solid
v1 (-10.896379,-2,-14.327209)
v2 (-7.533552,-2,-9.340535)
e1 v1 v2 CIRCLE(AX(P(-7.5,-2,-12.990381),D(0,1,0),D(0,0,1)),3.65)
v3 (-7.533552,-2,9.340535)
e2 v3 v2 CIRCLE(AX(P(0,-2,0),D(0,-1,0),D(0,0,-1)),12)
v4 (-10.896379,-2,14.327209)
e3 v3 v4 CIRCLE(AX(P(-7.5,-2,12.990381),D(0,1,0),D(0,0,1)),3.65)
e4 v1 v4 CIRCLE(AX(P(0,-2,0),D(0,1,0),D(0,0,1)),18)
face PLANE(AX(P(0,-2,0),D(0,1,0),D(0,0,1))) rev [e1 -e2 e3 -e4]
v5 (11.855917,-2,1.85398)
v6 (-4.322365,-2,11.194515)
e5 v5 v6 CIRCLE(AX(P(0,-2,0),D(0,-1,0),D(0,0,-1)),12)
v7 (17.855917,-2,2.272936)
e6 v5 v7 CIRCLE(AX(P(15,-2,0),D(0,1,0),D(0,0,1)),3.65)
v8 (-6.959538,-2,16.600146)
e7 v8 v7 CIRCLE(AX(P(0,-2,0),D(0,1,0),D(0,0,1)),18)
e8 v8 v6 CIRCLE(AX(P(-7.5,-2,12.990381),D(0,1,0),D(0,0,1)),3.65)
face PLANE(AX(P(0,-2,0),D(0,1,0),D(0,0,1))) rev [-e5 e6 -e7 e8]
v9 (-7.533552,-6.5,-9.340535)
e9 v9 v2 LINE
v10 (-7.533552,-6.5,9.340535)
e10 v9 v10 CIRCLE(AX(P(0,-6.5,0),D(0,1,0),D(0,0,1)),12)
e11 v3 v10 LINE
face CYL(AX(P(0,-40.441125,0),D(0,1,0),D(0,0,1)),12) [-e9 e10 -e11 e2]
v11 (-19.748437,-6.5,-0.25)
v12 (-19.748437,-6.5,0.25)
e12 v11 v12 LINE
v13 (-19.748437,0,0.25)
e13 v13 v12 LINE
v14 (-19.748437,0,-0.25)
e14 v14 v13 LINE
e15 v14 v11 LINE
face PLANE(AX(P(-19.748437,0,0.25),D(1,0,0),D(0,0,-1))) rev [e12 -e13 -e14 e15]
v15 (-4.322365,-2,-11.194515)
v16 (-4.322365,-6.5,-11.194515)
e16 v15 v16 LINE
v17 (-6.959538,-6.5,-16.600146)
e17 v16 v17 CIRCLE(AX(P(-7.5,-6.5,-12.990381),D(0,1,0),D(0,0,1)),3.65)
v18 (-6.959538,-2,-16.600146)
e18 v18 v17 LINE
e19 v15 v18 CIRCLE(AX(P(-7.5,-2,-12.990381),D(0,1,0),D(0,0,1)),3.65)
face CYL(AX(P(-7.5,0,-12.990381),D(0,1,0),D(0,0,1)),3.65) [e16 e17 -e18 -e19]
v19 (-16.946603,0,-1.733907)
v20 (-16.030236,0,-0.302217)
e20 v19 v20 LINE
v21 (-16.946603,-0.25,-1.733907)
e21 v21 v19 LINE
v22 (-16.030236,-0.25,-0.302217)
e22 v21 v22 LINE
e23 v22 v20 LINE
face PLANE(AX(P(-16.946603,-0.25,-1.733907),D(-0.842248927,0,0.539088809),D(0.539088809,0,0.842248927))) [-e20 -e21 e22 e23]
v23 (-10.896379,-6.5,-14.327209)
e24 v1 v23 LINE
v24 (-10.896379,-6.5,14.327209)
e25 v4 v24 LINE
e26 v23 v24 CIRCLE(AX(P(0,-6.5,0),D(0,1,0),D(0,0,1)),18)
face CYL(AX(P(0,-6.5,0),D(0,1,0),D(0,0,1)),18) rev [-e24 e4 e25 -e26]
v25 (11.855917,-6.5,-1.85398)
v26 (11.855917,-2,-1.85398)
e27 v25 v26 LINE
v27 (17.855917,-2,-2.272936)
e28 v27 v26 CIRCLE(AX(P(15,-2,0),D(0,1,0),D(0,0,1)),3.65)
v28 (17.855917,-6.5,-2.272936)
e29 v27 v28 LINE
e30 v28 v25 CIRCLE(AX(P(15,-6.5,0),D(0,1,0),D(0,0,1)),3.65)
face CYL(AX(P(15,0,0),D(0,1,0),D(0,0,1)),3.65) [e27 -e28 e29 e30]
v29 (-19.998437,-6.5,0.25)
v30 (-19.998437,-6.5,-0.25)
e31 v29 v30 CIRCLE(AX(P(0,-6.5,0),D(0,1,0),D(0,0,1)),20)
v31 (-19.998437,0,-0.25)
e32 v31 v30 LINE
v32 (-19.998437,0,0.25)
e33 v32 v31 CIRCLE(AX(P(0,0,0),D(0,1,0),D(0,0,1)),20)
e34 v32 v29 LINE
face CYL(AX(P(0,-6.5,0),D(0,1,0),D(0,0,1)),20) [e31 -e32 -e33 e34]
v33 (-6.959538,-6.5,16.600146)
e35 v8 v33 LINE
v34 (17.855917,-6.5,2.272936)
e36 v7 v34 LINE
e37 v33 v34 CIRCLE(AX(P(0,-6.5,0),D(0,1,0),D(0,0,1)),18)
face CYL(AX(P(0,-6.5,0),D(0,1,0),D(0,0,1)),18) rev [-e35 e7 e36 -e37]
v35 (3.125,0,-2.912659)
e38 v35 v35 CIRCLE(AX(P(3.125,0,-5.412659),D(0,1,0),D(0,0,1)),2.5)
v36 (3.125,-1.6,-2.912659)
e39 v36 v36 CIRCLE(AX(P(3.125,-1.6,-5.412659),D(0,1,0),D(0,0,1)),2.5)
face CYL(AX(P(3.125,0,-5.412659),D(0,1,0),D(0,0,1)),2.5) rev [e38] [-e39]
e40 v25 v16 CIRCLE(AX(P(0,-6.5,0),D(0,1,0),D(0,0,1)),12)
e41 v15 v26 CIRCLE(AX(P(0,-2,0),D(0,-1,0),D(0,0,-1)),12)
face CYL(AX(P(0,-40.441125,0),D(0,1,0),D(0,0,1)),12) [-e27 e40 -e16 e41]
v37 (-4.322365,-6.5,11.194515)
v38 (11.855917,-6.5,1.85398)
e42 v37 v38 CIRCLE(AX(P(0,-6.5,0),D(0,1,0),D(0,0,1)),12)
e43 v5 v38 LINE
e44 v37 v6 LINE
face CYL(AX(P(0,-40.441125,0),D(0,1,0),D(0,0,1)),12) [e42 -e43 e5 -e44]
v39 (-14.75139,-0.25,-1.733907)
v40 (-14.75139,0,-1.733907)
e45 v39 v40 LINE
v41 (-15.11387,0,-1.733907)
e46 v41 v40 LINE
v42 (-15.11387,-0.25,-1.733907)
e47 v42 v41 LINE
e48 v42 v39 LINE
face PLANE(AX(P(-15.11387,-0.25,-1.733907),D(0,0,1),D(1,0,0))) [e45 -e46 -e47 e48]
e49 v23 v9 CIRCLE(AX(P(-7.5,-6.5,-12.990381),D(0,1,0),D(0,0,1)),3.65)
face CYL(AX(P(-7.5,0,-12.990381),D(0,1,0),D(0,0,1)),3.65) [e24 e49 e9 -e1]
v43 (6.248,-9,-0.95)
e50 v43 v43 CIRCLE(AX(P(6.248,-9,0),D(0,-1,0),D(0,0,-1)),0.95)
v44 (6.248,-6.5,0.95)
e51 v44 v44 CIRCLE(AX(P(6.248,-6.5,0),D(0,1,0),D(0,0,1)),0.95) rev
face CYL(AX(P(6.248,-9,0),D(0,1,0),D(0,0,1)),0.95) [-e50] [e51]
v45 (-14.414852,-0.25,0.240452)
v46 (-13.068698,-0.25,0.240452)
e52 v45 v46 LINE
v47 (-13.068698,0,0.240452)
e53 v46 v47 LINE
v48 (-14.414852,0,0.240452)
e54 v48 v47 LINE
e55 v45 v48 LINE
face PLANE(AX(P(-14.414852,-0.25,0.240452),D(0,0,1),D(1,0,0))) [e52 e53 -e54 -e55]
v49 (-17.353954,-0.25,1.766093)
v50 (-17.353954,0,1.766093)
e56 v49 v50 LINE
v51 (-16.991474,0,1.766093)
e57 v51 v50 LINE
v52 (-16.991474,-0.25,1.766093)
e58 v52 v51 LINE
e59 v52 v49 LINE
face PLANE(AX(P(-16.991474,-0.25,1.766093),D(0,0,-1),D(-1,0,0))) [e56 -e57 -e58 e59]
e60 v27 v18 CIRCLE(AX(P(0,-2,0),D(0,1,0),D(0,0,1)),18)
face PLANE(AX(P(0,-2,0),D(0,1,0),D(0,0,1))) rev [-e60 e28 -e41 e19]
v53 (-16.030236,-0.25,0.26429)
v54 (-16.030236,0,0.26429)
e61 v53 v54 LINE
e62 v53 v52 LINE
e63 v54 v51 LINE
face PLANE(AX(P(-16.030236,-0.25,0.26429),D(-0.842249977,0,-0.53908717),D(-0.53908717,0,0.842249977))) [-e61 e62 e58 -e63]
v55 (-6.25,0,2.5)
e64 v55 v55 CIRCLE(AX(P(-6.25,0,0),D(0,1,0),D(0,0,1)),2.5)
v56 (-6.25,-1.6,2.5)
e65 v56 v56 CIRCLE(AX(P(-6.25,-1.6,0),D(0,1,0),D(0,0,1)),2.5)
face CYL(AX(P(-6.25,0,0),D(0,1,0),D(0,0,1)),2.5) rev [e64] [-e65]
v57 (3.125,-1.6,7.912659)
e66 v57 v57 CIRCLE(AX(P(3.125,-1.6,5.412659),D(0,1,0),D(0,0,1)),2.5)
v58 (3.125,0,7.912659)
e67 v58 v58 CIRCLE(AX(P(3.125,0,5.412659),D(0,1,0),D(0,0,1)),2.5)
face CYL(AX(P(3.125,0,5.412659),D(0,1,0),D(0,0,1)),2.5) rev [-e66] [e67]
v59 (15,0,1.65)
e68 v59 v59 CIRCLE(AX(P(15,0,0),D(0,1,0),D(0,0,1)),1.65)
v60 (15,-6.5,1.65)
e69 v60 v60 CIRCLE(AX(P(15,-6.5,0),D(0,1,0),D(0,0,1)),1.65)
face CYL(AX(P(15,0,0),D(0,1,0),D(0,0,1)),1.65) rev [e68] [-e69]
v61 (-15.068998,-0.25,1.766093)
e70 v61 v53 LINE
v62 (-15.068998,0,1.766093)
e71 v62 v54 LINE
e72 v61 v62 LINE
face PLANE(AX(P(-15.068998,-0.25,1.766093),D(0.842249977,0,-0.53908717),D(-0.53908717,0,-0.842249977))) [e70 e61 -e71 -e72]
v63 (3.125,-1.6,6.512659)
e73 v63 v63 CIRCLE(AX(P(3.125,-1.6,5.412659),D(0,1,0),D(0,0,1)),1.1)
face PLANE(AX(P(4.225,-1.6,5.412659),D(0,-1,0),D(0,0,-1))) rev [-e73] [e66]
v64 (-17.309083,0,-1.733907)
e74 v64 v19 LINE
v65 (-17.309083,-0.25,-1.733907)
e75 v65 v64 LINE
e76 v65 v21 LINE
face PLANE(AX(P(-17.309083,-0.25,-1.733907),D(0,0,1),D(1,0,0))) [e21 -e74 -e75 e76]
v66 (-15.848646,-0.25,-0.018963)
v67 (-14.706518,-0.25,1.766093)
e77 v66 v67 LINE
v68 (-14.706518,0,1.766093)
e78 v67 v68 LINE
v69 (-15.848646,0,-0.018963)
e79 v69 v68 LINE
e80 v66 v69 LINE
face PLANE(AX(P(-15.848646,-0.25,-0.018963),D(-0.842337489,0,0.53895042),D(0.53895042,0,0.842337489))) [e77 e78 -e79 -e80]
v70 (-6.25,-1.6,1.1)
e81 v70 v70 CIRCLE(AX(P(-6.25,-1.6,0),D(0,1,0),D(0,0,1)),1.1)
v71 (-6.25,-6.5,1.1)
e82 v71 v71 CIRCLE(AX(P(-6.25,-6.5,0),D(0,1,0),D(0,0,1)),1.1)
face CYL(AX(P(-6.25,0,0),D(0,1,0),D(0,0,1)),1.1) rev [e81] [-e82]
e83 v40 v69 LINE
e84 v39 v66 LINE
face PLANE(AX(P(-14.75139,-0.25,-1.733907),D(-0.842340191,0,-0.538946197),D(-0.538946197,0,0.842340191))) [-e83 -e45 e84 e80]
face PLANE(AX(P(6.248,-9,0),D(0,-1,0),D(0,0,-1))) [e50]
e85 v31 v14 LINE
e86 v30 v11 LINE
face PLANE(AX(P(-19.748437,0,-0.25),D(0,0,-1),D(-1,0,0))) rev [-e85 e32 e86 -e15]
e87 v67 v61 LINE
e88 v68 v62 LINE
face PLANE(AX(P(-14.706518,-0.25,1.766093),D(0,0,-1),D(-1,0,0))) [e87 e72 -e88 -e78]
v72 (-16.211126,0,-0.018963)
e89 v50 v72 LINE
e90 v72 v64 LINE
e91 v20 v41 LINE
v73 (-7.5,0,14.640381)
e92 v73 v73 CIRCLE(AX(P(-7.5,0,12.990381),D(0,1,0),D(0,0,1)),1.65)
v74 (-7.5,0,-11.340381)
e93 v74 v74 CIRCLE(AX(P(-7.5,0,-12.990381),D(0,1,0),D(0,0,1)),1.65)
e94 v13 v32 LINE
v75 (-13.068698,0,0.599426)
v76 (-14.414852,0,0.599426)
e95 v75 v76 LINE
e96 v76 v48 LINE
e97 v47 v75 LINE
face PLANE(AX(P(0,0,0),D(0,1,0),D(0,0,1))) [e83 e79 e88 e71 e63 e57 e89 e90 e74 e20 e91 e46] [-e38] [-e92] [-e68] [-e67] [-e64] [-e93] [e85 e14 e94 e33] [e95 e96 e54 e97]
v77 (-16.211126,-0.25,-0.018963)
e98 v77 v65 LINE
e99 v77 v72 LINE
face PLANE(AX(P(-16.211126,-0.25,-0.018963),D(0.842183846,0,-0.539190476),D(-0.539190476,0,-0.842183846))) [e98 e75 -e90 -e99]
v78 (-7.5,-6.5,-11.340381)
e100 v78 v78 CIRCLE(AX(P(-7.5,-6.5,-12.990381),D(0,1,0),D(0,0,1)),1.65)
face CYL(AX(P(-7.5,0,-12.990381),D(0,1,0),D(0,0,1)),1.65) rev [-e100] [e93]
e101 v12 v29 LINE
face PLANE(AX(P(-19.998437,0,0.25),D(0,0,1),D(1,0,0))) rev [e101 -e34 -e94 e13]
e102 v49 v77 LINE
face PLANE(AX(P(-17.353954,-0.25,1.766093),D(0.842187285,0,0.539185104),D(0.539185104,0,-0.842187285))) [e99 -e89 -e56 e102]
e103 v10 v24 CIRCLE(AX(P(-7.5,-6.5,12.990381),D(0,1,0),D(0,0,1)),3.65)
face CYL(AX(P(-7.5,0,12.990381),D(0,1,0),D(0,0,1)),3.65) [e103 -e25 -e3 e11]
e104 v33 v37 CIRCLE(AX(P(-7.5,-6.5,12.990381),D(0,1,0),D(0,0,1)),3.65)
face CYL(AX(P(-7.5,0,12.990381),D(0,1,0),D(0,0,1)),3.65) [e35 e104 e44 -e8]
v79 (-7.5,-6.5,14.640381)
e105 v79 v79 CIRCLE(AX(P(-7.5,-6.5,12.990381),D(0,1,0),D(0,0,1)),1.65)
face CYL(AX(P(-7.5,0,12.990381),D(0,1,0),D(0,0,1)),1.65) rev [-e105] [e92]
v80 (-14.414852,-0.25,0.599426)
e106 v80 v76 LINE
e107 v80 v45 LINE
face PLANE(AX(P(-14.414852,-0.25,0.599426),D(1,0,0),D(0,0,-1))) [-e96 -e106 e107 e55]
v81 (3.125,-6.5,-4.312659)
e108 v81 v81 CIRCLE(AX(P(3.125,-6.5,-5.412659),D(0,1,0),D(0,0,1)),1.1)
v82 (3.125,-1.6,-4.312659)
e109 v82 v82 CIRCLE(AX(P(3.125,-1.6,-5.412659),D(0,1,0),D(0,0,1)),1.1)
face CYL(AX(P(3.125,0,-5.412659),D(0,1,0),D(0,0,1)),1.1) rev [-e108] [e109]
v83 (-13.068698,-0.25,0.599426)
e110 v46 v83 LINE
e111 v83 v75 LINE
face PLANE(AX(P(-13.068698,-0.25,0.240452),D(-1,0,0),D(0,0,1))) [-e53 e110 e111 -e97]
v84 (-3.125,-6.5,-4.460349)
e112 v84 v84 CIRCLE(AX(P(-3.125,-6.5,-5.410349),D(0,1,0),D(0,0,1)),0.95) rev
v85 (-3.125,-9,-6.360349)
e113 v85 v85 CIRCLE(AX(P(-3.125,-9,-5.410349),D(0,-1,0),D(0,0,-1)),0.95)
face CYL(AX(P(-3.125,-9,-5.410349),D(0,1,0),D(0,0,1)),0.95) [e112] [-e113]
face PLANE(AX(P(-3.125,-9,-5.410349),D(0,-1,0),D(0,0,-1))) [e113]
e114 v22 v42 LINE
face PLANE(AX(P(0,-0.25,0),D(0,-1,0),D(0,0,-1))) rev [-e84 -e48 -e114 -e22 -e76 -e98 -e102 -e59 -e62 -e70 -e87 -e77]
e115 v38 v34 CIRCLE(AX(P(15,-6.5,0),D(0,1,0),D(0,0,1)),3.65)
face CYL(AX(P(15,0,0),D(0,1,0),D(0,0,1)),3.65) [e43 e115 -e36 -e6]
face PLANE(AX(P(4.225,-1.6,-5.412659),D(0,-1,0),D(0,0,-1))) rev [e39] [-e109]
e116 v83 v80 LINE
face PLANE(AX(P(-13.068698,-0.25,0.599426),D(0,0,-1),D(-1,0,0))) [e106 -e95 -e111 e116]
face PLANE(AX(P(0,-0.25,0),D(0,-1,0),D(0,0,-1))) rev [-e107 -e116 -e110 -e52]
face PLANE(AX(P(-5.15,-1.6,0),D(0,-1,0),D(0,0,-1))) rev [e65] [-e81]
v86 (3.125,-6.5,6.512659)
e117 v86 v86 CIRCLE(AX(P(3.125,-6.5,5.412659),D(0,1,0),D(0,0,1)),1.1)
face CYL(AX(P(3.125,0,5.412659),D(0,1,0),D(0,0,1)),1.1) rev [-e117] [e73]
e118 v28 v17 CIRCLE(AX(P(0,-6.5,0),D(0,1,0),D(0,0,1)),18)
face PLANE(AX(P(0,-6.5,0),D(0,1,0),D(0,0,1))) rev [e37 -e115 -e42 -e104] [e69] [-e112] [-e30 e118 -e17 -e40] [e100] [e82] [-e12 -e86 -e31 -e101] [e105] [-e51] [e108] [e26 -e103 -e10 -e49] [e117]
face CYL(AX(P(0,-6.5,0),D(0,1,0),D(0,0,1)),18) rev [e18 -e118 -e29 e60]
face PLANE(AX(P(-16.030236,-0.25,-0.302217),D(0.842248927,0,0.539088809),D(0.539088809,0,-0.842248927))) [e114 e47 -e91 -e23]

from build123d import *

# Parameters (mm, degrees)
SKETCH1_R                                        = 20
BOSS_EXTRUDE1_DEPTH                              = 6.5
CBORE_FOR_M2_PAN_HEAD_MACHINE_SCREW1_D           = 2.2
CBORE_FOR_M2_PAN_HEAD_MACHINE_SCREW1_CBORE_D     = 5
CBORE_FOR_M2_PAN_HEAD_MACHINE_SCREW1_CBORE_DEPTH = 1.6
TAP_DRILL_FOR_M4X0_7_TAP1_D                      = 3.3
SHELL1_START                                     = -6.5
SHELL1_OUTLINE_R                                 = 4.5
SHELL1_DEPTH                                     = 4.5
SHELL1_2_OUTLINE_R                               = 4.5
SHELL1_2_OUTLINE_R_2                             = 3.1
SHELL1_2_DEPTH                                   = 2.9
BOSS_EXTRUDE2_START                              = 4.5
SKETCH5_R                                        = 12
SKETCH5_R_2                                      = 1.1
BOSS_EXTRUDE2_DEPTH                              = 4.5
SKETCH6_W                                        = 1.346153846
SKETCH6_H                                        = 0.358974359
CUT_EXTRUDE1_DEPTH                               = 0.25
SKETCH7_R                                        = 0.95
BOSS_EXTRUDE3_DEPTH                              = 2.5
CUT_EXTRUDE2_DEPTH                               = 30.021543722


# Read off the part's stored shape, not the designer's step: Shell1
with BuildPart() as part:
    # Sketch1 → Boss-Extrude1 (new body)
    with BuildSketch(Plane(origin=(0, 0, 0), x_dir=(1, 0, 0), z_dir=(0, 1, 0))):
        with Locations(Location((0, 0, 0), (0, 0, 270))):
            Circle(SKETCH1_R)
    extrude(amount=-BOSS_EXTRUDE1_DEPTH)

    # CBORE for M2 Pan Head Machine Screw1 (through all)
    with Locations(Plane(origin=(3.125, 0, -5.412658774), x_dir=(0, 0, 1), z_dir=(0, 1, 0))):
        with Locations((0, 0), (5.412658774, -9.375), (10.825317548, 0)):
            CounterBoreHole(CBORE_FOR_M2_PAN_HEAD_MACHINE_SCREW1_D / 2, CBORE_FOR_M2_PAN_HEAD_MACHINE_SCREW1_CBORE_D / 2, CBORE_FOR_M2_PAN_HEAD_MACHINE_SCREW1_CBORE_DEPTH)

    # Tap Drill for M4x0.7 Tap1 (through all)
    with Locations(Plane(origin=(0, 0, 0), x_dir=(1, 0, 0), z_dir=(0, 1, 0))):
        with Locations((15, 0), (-7.5, 12.990381057), (-7.5, -12.990381057)):
            Hole(TAP_DRILL_FOR_M4X0_7_TAP1_D / 2)

    # Shell1 outline → Shell1 (cut)
    with BuildSketch(Plane(origin=(0, 0, 0), x_dir=(1, 0, 0), z_dir=(0, 1, 0)).offset(SHELL1_START)):
        with BuildLine():
            ThreePointArc((17.855916667, -2.272936425), (11.35, 0), (17.855916667, 2.272936425))
            ThreePointArc((17.855916667, 2.272936425), (9, 15.588457268), (-6.959537648, 16.600145654))
            ThreePointArc((-6.959537648, 16.600145654), (-5.675, 9.829388333), (-10.896379019, 14.327209229))
            ThreePointArc((-10.896379019, 14.327209229), (-18, 0), (-10.896379019, -14.327209229))
            ThreePointArc((-10.896379019, -14.327209229), (-5.675, -9.829388333), (-6.959537648, -16.600145654))
            ThreePointArc((-6.959537648, -16.600145654), (9, -15.588457268), (17.855916667, -2.272936425))
        make_face()
        with Locations((-6.25, 0)):
            Circle(SHELL1_OUTLINE_R, mode=Mode.SUBTRACT)
        with Locations((3.125, -5.412658774)):
            Circle(SHELL1_OUTLINE_R, mode=Mode.SUBTRACT)
        with Locations((3.125, 5.412658774)):
            Circle(SHELL1_OUTLINE_R, mode=Mode.SUBTRACT)
    extrude(amount=SHELL1_DEPTH, mode=Mode.SUBTRACT)

    # Shell1 2 outline → Shell1 2 (cut)
    # profile 1 of 3: a face of its own
    with BuildSketch(Plane(origin=(0, 0, 0), x_dir=(1, 0, 0), z_dir=(0, 1, 0)).offset(SHELL1_START)):
        with Locations((3.125, -5.412658774)):
            Circle(SHELL1_2_OUTLINE_R)
        with Locations((3.125, -5.412658774)):
            Circle(SHELL1_2_OUTLINE_R_2, mode=Mode.SUBTRACT)
    # profile 2 of 3: a face of its own
    with BuildSketch(Plane(origin=(0, 0, 0), x_dir=(1, 0, 0), z_dir=(0, 1, 0)).offset(SHELL1_START)):
        with Locations((-6.25, 0)):
            Circle(SHELL1_2_OUTLINE_R)
        with Locations((-6.25, 0)):
            Circle(SHELL1_2_OUTLINE_R_2, mode=Mode.SUBTRACT)
    # profile 3 of 3: a face of its own
    with BuildSketch(Plane(origin=(0, 0, 0), x_dir=(1, 0, 0), z_dir=(0, 1, 0)).offset(SHELL1_START)):
        with Locations((3.125, 5.412658774)):
            Circle(SHELL1_2_OUTLINE_R)
        with Locations((3.125, 5.412658774)):
            Circle(SHELL1_2_OUTLINE_R_2, mode=Mode.SUBTRACT)
    extrude(amount=SHELL1_2_DEPTH, mode=Mode.SUBTRACT)

    # Sketch5 → Boss-Extrude2 (add)
    with BuildSketch(Plane.XZ.offset(2).offset(BOSS_EXTRUDE2_START)):
        Circle(SKETCH5_R)
        with Locations(Location((3.125, -5.412658774, 0), (0, 0, 90))):
            Circle(SKETCH5_R_2, mode=Mode.SUBTRACT)
        with Locations(Location((-6.25, 0, 0), (0, 0, 90))):
            Circle(SKETCH5_R_2, mode=Mode.SUBTRACT)
        with Locations(Location((3.125, 5.412658774, 0), (0, 0, 90))):
            Circle(SKETCH5_R_2, mode=Mode.SUBTRACT)
    extrude(amount=-BOSS_EXTRUDE2_DEPTH)

    # Sketch6 → Cut-Extrude1 (cut)
    with BuildSketch(Plane(origin=(0, 0, 0), x_dir=(1, 0, 0), z_dir=(0, 1, 0))):
        Polygon((-17.309082509, 1.733907393), (-16.946602541, 1.733907393), (-16.030236355, 0.302216688), (-15.11387017, 1.733907393), (-14.751390202, 1.733907393), (-15.848645811, 0.018963483), (-14.706518407, -1.766092607), (-15.068998375, -1.766092607), (-16.030236355, -0.264289722), (-16.991474336, -1.766092607), (-17.353954304, -1.766092607), (-16.211125779, 0.018963483), align=None)
        with Locations((-13.741774817, -0.419938761)):
            Rectangle(SKETCH6_W, SKETCH6_H)
    extrude(amount=-CUT_EXTRUDE1_DEPTH, mode=Mode.SUBTRACT)

    # Sketch7 → Boss-Extrude3 (add)
    with BuildSketch(Plane.XZ.offset(6.5)):
        with Locations(Location((6.248, 0, 0), (0, 0, 90))):
            Circle(SKETCH7_R)
        with Locations(Location((-3.125, -5.410349249, 0), (0, 0, 90))):
            Circle(SKETCH7_R)
    extrude(amount=BOSS_EXTRUDE3_DEPTH)

    # Sketch9 → Cut-Extrude2 (cut, through all)
    with BuildSketch(Plane.XZ.offset(6.5)):
        with BuildLine():
            Line((-19.748437439, 0.25), (-19.748437439, -0.25))
            Line((-19.748437439, -0.25), (-19.998437439, -0.25))
            ThreePointArc((-19.998437439, -0.25), (-20, 0), (-19.998437439, 0.25))
            Line((-19.998437439, 0.25), (-19.748437439, 0.25))
        make_face()
    extrude(amount=-CUT_EXTRUDE2_DEPTH, mode=Mode.SUBTRACT)


solid = part.part
